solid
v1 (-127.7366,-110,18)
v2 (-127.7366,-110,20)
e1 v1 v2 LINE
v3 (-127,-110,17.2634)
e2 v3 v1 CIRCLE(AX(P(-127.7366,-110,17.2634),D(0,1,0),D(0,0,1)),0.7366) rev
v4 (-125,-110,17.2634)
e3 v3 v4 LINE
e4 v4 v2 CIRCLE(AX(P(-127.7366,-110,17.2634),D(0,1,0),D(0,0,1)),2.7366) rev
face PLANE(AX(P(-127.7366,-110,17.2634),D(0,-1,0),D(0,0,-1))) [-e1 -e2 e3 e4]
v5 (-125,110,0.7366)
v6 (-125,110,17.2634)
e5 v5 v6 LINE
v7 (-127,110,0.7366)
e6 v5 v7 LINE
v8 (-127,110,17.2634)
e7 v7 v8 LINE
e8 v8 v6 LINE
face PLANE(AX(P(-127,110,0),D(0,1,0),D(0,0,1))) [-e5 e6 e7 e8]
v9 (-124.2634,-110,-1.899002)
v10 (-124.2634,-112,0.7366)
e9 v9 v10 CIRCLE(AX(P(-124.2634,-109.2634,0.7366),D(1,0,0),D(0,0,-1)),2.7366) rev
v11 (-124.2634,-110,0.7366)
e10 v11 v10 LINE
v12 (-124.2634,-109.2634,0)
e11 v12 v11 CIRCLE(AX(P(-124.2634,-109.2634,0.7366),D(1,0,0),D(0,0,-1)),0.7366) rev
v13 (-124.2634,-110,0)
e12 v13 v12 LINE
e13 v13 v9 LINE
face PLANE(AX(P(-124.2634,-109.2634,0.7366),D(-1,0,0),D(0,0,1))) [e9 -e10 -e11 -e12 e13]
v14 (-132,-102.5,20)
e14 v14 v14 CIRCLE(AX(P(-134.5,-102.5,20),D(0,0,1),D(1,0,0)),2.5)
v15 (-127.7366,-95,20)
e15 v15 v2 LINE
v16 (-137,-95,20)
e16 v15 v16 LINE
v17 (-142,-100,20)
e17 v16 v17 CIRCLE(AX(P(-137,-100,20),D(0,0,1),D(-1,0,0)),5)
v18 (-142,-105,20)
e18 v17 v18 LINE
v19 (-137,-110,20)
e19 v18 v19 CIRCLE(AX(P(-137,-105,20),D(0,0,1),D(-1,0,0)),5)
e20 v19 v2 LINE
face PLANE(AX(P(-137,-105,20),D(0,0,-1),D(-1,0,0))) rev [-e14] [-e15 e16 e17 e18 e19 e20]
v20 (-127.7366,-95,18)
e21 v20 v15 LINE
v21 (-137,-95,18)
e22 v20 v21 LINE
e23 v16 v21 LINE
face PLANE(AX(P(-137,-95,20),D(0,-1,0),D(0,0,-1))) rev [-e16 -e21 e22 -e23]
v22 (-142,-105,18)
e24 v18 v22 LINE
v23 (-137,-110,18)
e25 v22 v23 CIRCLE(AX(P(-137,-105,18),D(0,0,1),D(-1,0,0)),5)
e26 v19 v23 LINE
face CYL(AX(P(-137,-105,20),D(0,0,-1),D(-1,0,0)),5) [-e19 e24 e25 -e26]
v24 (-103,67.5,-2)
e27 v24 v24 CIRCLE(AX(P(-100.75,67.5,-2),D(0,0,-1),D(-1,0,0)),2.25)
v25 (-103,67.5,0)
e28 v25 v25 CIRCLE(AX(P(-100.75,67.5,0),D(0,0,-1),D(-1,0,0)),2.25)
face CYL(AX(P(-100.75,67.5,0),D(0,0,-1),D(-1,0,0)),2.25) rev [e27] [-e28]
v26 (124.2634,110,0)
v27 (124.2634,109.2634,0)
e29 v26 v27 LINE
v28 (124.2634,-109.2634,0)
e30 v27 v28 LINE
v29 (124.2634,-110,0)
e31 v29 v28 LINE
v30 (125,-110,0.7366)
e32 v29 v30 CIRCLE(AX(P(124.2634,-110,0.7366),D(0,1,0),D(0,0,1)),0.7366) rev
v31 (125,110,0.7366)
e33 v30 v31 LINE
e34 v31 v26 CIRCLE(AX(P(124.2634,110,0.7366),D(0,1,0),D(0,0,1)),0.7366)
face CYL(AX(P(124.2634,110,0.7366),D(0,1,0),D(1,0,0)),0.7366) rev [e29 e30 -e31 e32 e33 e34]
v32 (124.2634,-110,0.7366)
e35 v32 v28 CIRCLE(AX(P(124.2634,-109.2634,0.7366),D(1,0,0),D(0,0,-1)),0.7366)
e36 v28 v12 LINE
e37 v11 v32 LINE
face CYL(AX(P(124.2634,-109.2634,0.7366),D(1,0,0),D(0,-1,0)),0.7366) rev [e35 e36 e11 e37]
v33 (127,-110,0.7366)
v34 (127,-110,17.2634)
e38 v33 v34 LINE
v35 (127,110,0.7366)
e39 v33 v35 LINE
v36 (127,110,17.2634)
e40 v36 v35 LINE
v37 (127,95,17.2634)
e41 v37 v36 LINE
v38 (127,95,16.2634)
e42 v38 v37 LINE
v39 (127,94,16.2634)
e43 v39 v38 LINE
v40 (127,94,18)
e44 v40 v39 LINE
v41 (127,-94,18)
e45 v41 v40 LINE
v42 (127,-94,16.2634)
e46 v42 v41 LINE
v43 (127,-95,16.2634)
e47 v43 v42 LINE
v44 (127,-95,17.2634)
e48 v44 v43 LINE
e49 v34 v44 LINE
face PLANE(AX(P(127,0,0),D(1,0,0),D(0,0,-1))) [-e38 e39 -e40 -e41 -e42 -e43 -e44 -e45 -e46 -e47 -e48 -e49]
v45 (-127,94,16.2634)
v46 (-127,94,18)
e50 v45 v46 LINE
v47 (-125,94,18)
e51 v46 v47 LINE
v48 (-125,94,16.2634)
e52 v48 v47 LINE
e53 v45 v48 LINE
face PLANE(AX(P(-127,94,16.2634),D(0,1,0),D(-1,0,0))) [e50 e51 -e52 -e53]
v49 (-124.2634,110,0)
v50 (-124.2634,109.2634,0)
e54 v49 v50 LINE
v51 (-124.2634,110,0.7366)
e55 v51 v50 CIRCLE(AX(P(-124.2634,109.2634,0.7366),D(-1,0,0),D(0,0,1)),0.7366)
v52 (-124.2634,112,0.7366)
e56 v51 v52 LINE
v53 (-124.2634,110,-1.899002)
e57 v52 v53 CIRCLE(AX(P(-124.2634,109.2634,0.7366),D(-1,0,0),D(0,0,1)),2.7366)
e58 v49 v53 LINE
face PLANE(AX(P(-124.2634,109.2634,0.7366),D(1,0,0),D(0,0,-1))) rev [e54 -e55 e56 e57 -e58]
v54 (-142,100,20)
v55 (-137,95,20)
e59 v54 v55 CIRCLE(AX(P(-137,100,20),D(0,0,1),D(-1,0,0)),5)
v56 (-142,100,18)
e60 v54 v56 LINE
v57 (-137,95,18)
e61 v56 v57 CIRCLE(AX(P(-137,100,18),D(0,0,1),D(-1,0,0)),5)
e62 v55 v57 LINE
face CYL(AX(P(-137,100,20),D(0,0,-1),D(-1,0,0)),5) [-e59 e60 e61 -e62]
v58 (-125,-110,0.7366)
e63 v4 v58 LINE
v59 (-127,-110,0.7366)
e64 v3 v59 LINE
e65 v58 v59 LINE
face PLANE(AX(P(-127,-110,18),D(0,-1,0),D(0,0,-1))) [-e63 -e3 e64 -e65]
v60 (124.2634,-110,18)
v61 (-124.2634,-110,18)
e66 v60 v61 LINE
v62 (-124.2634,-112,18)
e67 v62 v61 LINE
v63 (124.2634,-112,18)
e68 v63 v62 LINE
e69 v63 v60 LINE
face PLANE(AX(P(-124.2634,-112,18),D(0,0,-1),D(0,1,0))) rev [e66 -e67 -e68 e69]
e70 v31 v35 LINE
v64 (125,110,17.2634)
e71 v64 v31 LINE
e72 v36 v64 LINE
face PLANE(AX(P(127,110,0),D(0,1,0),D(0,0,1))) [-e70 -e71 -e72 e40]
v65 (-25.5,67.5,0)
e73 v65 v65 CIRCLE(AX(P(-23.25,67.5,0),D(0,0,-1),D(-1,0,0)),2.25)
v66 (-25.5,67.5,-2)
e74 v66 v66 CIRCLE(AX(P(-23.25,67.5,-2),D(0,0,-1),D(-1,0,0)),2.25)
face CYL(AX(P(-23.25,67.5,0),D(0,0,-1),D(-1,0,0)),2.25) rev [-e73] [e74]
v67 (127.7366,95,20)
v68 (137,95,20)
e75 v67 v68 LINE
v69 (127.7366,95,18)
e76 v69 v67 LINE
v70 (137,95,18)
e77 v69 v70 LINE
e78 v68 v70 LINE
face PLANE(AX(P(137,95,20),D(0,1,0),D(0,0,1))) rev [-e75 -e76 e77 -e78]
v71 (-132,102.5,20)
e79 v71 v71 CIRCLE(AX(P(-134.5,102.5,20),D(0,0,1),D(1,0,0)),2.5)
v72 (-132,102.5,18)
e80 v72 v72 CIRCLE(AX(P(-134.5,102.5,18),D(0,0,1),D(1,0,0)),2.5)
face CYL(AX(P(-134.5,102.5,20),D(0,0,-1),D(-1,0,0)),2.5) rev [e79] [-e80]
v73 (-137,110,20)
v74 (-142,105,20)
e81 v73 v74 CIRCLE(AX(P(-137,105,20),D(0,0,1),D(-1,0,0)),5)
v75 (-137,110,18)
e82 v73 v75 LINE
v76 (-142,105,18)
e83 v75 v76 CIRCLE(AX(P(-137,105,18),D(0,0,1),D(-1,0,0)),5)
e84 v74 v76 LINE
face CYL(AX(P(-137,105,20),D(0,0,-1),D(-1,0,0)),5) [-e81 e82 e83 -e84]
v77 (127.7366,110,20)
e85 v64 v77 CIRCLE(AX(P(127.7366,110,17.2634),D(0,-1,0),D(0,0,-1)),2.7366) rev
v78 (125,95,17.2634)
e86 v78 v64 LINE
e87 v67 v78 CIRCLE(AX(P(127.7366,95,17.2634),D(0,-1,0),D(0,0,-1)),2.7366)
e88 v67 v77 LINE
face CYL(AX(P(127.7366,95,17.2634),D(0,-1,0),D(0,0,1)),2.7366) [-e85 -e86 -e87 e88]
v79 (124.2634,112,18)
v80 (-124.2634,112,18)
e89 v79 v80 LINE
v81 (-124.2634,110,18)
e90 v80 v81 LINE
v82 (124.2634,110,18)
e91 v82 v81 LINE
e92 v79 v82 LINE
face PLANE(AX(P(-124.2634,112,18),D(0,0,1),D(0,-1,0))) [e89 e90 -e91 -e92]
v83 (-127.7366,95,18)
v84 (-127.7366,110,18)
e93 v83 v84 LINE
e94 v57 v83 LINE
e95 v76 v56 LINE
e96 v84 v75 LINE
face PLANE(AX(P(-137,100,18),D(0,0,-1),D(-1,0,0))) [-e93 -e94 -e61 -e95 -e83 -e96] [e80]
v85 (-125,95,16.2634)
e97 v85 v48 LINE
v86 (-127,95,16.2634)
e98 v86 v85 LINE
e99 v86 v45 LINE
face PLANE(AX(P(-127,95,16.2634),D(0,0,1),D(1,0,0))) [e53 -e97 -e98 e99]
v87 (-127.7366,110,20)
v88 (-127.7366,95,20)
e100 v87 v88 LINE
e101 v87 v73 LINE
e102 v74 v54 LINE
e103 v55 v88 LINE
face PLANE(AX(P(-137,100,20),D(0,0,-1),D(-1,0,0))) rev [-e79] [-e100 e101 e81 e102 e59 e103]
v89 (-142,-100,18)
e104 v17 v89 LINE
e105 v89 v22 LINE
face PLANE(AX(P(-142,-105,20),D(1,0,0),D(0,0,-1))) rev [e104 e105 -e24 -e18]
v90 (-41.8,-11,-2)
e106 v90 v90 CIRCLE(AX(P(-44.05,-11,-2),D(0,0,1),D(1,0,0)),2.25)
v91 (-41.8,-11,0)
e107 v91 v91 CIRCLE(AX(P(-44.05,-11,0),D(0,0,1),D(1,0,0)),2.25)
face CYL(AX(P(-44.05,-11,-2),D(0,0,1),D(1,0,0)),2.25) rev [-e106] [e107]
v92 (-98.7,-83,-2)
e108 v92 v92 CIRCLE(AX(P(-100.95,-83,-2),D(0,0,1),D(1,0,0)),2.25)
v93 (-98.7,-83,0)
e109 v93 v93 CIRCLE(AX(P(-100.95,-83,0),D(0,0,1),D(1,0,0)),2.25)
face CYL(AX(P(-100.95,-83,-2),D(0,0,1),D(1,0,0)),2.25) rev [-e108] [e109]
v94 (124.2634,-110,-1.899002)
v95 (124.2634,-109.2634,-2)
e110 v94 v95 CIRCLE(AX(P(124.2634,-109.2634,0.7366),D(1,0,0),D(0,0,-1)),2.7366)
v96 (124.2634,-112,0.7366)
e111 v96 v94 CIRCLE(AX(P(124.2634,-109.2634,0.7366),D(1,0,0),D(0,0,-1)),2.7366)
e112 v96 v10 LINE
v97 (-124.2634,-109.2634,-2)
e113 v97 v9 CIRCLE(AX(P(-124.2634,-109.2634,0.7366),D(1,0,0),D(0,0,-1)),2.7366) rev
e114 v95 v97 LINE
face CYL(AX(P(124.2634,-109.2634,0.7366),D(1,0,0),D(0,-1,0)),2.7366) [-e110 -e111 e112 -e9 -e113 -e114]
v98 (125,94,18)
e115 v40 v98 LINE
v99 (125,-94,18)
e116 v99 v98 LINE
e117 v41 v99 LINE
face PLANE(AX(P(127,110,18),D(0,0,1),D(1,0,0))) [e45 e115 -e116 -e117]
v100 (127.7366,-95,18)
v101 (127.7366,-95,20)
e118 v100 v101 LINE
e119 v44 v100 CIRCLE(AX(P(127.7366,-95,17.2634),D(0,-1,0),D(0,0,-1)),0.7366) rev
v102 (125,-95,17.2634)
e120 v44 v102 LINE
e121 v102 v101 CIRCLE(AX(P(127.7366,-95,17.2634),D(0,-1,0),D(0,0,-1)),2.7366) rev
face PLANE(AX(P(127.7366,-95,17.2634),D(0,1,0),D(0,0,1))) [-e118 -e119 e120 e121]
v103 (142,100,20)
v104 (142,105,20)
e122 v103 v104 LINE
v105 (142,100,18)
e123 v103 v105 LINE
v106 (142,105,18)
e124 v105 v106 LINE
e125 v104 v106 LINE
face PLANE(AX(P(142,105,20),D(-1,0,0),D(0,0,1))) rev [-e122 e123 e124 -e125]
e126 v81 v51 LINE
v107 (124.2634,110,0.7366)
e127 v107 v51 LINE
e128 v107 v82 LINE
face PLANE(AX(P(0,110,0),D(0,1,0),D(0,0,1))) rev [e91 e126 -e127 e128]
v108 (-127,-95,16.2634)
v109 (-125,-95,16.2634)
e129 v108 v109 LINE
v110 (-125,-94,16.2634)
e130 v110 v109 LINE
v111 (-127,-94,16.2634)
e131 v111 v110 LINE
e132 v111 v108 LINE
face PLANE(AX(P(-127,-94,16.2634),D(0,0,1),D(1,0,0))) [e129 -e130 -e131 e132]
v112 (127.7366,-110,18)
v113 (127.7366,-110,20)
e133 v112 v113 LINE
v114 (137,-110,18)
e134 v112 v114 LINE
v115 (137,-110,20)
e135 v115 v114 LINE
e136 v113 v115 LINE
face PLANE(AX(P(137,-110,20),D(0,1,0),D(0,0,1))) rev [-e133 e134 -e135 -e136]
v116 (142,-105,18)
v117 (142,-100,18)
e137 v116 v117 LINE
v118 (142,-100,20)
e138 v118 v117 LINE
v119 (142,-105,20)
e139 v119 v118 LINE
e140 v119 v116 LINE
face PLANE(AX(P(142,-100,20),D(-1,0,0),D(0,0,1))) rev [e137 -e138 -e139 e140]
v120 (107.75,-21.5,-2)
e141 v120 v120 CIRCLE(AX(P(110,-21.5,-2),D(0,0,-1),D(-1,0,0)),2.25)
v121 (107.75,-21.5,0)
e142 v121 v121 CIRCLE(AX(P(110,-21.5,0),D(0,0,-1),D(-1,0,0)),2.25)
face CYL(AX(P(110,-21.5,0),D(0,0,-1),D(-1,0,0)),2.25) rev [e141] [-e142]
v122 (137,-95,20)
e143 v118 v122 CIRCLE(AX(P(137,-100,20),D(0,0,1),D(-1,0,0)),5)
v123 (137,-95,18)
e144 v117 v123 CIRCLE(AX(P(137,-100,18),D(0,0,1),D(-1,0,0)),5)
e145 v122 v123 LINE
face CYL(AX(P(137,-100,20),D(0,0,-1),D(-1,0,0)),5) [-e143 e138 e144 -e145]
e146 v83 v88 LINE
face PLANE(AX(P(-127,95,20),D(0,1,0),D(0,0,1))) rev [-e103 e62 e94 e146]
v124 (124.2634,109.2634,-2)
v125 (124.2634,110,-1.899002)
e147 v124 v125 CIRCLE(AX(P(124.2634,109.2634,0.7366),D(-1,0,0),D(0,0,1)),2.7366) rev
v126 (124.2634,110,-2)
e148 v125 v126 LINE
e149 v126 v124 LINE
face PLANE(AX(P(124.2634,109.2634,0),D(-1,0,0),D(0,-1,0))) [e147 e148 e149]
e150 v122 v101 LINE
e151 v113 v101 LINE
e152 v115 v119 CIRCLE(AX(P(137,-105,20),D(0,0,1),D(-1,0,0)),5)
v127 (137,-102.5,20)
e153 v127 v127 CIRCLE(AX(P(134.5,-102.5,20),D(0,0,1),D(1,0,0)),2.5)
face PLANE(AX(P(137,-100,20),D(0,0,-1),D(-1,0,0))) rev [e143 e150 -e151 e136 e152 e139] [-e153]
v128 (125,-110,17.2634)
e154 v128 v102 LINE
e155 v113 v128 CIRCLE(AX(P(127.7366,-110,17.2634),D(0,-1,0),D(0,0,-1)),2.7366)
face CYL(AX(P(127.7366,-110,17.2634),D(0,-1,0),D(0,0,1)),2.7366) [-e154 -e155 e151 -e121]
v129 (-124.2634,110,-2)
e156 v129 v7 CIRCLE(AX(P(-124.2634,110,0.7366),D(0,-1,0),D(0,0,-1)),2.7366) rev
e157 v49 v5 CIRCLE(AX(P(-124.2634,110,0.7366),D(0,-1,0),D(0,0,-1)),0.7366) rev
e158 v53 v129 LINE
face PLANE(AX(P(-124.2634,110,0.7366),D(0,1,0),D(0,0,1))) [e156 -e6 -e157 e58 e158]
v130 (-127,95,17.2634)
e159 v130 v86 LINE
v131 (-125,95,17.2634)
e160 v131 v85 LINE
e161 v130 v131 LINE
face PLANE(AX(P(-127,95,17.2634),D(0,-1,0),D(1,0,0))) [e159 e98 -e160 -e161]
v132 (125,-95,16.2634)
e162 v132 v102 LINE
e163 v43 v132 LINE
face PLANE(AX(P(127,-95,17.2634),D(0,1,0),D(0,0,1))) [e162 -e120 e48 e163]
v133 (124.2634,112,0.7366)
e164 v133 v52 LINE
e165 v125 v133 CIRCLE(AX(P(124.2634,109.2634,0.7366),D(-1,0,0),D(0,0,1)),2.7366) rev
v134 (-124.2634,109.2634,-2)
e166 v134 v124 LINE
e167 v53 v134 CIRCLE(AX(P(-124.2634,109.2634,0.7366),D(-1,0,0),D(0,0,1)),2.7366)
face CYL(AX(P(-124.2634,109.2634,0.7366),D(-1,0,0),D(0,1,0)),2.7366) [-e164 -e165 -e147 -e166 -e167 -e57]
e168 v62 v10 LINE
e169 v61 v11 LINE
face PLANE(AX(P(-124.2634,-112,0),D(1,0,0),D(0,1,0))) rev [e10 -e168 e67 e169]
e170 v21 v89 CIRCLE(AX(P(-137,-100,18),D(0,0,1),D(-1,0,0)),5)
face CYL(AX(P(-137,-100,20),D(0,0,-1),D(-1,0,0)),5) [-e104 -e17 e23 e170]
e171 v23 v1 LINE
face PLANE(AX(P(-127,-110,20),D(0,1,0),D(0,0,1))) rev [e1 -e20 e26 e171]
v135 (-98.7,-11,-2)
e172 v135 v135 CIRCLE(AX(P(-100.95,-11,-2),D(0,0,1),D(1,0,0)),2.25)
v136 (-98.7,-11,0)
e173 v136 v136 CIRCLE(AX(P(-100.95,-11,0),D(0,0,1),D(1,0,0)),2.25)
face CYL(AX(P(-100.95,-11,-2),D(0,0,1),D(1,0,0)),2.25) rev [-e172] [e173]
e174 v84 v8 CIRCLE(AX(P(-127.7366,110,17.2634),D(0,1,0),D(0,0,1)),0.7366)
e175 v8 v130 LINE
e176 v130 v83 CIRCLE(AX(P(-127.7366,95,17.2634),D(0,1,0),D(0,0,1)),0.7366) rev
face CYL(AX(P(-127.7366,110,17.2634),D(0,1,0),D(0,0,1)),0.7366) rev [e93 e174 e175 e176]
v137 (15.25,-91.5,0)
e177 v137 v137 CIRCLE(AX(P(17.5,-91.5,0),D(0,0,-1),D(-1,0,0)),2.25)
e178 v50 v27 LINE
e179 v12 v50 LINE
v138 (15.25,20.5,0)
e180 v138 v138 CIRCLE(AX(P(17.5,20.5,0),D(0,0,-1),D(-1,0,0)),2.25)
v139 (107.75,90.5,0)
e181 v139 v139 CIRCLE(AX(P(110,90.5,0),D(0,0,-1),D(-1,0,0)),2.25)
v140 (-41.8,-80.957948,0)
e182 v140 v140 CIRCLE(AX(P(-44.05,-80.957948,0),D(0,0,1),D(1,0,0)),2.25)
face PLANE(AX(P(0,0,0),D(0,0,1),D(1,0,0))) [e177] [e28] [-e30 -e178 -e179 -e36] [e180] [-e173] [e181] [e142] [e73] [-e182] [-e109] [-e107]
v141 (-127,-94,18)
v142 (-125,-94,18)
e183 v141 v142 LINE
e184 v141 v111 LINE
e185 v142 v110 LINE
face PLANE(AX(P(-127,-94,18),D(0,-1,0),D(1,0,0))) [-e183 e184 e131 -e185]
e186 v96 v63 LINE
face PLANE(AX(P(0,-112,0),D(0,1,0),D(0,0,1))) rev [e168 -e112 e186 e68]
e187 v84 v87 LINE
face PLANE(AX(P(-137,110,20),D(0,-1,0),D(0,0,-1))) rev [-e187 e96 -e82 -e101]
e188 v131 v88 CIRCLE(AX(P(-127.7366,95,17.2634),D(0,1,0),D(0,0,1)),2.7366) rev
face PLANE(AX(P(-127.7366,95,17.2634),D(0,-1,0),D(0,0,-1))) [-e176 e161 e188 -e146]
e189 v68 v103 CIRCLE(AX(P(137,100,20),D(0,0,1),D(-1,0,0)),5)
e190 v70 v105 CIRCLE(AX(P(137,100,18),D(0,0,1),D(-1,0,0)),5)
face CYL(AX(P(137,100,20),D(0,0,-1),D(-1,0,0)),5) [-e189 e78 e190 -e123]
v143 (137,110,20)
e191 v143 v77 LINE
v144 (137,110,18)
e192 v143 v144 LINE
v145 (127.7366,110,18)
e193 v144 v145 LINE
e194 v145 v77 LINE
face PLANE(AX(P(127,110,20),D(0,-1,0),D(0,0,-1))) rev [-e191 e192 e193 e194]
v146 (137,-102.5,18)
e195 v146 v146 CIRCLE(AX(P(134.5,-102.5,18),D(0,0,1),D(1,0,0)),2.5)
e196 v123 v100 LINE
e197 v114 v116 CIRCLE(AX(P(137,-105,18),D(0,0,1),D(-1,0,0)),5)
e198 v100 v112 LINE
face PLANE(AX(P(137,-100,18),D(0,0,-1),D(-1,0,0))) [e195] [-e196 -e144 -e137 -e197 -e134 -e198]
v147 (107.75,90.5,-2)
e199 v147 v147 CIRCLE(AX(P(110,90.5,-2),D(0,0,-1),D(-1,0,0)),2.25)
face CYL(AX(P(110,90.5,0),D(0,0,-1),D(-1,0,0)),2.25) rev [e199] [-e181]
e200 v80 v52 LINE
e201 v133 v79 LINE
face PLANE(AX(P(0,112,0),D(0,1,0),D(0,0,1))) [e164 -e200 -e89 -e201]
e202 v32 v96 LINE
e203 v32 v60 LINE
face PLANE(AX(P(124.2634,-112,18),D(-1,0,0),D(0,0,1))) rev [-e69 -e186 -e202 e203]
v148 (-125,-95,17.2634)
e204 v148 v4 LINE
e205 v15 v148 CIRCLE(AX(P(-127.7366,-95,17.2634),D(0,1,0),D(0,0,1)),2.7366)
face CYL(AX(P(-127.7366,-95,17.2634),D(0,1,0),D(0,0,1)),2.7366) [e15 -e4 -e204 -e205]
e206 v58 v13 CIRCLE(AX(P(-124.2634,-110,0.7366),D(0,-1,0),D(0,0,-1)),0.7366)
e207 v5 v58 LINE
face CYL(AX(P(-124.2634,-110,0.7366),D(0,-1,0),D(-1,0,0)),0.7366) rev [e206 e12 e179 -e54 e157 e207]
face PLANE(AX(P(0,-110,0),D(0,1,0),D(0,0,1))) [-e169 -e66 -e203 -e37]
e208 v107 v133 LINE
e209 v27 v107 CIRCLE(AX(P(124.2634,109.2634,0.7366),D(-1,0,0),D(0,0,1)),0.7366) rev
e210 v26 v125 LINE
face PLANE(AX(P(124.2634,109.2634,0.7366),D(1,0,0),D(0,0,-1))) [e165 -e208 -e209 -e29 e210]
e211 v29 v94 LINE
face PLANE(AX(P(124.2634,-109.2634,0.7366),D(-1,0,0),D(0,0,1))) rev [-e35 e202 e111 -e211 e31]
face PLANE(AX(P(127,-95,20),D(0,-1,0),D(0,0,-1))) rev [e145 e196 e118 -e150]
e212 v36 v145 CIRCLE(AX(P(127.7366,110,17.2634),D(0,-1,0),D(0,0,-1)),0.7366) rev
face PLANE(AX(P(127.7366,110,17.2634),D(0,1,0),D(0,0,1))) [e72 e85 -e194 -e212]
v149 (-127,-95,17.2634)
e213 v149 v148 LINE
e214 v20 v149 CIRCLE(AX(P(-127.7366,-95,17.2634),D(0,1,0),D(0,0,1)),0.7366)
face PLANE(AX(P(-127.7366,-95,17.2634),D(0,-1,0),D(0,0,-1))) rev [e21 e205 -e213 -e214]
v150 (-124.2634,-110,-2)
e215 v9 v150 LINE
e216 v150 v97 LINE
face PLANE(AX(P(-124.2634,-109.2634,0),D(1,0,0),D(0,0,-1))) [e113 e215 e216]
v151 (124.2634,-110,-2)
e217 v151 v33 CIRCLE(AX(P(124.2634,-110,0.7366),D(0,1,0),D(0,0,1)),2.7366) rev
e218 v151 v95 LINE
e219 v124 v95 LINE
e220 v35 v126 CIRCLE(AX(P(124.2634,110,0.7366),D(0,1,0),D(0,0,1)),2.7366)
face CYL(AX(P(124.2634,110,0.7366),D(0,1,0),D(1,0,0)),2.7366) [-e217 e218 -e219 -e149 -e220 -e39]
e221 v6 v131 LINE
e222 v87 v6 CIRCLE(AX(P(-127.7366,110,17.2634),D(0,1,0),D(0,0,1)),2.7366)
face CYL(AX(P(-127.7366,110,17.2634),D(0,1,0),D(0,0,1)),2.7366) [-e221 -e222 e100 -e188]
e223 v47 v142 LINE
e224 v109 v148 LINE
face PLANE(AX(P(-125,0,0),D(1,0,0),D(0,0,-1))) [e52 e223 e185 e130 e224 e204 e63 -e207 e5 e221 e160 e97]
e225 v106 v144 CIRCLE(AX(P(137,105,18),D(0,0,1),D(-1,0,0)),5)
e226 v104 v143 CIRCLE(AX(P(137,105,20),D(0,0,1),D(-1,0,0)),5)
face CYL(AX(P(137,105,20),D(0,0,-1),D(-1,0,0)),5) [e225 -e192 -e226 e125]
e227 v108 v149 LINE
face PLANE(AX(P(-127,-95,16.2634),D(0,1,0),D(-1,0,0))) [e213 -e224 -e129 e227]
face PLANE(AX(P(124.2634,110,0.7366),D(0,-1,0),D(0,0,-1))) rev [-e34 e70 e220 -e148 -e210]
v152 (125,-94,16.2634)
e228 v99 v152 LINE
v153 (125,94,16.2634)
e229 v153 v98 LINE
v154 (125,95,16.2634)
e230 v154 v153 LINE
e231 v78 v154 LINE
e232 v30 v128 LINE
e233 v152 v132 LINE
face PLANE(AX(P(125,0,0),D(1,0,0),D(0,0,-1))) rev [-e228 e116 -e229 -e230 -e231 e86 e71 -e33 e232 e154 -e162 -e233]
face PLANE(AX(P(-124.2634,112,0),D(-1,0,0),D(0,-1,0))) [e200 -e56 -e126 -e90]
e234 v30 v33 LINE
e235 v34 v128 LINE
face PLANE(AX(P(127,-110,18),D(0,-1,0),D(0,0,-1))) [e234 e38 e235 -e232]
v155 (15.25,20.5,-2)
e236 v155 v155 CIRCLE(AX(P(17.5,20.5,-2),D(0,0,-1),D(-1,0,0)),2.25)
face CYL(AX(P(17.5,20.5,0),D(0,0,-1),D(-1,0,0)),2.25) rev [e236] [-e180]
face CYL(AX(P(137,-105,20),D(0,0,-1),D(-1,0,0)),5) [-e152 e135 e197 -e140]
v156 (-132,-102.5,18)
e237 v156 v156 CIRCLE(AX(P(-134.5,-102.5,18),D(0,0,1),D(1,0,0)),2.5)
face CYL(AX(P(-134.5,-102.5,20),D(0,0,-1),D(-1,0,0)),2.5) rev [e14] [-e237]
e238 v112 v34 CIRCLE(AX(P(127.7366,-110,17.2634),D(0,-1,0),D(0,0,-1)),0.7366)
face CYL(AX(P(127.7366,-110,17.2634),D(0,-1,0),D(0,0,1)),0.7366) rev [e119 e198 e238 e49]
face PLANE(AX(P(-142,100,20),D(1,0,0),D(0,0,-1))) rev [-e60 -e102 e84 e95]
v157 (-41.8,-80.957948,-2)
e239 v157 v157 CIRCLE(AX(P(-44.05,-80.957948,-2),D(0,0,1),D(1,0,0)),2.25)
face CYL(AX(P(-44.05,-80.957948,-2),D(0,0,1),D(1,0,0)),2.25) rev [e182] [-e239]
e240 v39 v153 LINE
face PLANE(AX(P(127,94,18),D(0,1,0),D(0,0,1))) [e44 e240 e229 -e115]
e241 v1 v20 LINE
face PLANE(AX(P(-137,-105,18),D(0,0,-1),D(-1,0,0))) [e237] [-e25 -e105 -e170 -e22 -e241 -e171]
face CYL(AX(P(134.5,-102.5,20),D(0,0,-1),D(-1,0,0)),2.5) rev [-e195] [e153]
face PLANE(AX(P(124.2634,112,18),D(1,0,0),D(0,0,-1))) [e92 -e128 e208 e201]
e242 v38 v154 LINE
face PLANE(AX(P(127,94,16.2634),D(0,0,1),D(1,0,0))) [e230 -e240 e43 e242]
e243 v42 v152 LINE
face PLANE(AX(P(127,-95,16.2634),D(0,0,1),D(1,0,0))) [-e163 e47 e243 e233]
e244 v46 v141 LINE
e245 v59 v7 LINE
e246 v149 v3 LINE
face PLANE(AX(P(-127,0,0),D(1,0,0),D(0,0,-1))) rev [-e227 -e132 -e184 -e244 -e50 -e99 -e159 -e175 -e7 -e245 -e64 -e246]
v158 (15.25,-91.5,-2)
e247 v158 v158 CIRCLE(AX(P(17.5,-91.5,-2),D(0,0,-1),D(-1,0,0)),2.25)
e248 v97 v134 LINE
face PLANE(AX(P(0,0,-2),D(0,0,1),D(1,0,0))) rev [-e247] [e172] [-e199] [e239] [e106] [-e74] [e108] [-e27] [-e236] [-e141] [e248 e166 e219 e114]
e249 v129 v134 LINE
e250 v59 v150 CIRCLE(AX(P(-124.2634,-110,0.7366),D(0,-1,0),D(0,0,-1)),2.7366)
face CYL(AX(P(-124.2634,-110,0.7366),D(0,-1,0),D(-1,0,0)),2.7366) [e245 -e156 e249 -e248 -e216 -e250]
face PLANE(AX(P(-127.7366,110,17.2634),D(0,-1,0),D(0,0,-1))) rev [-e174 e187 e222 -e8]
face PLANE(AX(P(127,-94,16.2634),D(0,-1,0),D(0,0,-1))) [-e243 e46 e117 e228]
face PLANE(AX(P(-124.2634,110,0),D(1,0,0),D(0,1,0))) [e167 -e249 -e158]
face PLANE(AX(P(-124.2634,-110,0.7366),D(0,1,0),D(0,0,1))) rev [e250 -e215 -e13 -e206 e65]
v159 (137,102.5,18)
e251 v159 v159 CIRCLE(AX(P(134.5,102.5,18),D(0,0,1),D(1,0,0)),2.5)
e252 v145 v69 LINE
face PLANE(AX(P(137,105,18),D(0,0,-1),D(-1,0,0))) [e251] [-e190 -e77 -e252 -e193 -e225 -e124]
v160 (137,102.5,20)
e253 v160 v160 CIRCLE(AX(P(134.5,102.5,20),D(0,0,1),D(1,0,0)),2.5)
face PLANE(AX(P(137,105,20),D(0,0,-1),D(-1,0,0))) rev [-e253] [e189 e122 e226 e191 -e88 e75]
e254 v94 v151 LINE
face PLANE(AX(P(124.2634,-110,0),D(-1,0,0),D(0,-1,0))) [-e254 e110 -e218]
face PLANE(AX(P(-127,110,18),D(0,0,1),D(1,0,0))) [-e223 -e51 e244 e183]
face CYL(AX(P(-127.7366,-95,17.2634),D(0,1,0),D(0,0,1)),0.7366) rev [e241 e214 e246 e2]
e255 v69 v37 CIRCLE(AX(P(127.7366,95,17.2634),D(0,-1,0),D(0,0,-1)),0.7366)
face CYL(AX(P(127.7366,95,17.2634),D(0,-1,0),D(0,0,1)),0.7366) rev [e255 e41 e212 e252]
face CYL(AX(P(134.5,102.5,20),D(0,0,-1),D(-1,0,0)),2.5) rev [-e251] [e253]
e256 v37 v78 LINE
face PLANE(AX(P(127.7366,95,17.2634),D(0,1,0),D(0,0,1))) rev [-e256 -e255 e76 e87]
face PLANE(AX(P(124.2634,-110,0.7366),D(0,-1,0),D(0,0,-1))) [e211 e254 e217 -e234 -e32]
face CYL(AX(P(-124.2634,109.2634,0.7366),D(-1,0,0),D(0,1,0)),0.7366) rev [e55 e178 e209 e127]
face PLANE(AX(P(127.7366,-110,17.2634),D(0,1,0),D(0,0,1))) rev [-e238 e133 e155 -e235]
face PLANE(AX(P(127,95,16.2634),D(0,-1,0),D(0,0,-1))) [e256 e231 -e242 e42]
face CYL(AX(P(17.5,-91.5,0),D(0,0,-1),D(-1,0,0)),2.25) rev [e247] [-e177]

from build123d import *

# Parameters (mm, degrees)
SKETCH1_W                      = 250
SKETCH1_H                      = 220
BASE_FLANGE1_DEPTH             = 2
EDGE_FLANGE1_STRIP_W           = 9.4732
EDGE_FLANGE1_STRIP_H           = 2
EDGE_FLANGE1_STRIP_CUT_DEPTH   = 220
EDGE_FLANGE1_STRIP_2_W         = 9.4732
EDGE_FLANGE1_STRIP_2_H         = 2
EDGE_FLANGE1_STRIP_CUT_2_DEPTH = 220
EDGE_FLANGE1_DEPTH             = 220
EDGE_FLANGE1_BEND_DEPTH        = 220
EDGE_FLANGE2_STRIP_W           = 9.4732
EDGE_FLANGE2_STRIP_H           = 2
EDGE_FLANGE2_STRIP_CUT_DEPTH   = 248.5268
EDGE_FLANGE2_DEPTH             = 248.5268
EDGE_FLANGE3_STRIP_W           = 9.4732
EDGE_FLANGE3_STRIP_H           = 2
EDGE_FLANGE3_STRIP_CUT_DEPTH   = 248.5268
EDGE_FLANGE3_DEPTH             = 248.5268
EDGE_FLANGE4_STRIP_W           = 9.4732
EDGE_FLANGE4_STRIP_H           = 2
EDGE_FLANGE4_STRIP_CUT_DEPTH   = 15
EDGE_FLANGE4_RELIEF_W          = 10.4732
EDGE_FLANGE4_RELIEF_H          = 1
EDGE_FLANGE4_RELIEF_CUT_DEPTH  = 2
EDGE_FLANGE4_DEPTH             = 15
EDGE_FLANGE4_START             = 2
EDGE_FLANGE4_PROFILE_R         = 2.5
EDGE_FLANGE4_FLAT_DEPTH        = 2
EDGE_FLANGE5_STRIP_W           = 9.4732
EDGE_FLANGE5_STRIP_H           = 2
EDGE_FLANGE5_STRIP_CUT_DEPTH   = 15
EDGE_FLANGE5_RELIEF_W          = 10.4732
EDGE_FLANGE5_RELIEF_H          = 1
EDGE_FLANGE5_RELIEF_CUT_DEPTH  = 2
EDGE_FLANGE5_DEPTH             = 15
EDGE_FLANGE5_START             = 2
EDGE_FLANGE5_PROFILE_R         = 2.5
EDGE_FLANGE5_FLAT_DEPTH        = 2
EDGE_FLANGE7_STRIP_W           = 9.4732
EDGE_FLANGE7_STRIP_H           = 2
EDGE_FLANGE7_STRIP_CUT_DEPTH   = 15
EDGE_FLANGE7_RELIEF_W          = 10.4732
EDGE_FLANGE7_RELIEF_H          = 1
EDGE_FLANGE7_RELIEF_CUT_DEPTH  = 2
EDGE_FLANGE7_DEPTH             = 15
EDGE_FLANGE7_START             = 2
EDGE_FLANGE7_PROFILE_R         = 2.5
EDGE_FLANGE7_FLAT_DEPTH        = 2
EDGE_FLANGE8_STRIP_W           = 9.4732
EDGE_FLANGE8_STRIP_H           = 2
EDGE_FLANGE8_STRIP_CUT_DEPTH   = 15
EDGE_FLANGE8_RELIEF_W          = 10.4732
EDGE_FLANGE8_RELIEF_H          = 1
EDGE_FLANGE8_RELIEF_CUT_DEPTH  = 2
EDGE_FLANGE8_DEPTH             = 15
EDGE_FLANGE8_START             = 2
EDGE_FLANGE8_PROFILE_R         = 2.5
EDGE_FLANGE8_FLAT_DEPTH        = 2
SKETCH34_R                     = 2.25
CUT_EXTRUDE1_DEPTH             = 10
SKETCH35_R                     = 2.25
CUT_EXTRUDE2_DEPTH             = 10


# Sheet-metal steps are written as plain solids
with BuildPart() as part:
    # Sketch1 → Base-Flange1 (new body)
    with BuildSketch(Plane.XY):
        Rectangle(SKETCH1_W, SKETCH1_H)
    extrude(amount=-BASE_FLANGE1_DEPTH)

    # Edge-Flange1 strip (across the edge) → Edge-Flange1 strip cut (cut)
    with BuildSketch(Plane(origin=(125, -110, 0), x_dir=(-1, 0, 0), z_dir=(0, 1, 0))):
        with Locations((-4, -1)):
            Rectangle(EDGE_FLANGE1_STRIP_W, EDGE_FLANGE1_STRIP_H)
    extrude(amount=EDGE_FLANGE1_STRIP_CUT_DEPTH, mode=Mode.SUBTRACT)

    # Edge-Flange1 strip 2 (across the edge) → Edge-Flange1 strip cut 2 (cut)
    with BuildSketch(Plane(origin=(-125, 110, 0), x_dir=(1, 0, 0), z_dir=(0, -1, 0))):
        with Locations((-4, -1)):
            Rectangle(EDGE_FLANGE1_STRIP_2_W, EDGE_FLANGE1_STRIP_2_H)
    extrude(amount=EDGE_FLANGE1_STRIP_CUT_2_DEPTH, mode=Mode.SUBTRACT)

    # Edge-Flange1 section (across the edge) → Edge-Flange1 (add)
    with BuildSketch(Plane(origin=(125, -110, 0), x_dir=(-1, 0, 0), z_dir=(0, 1, 0))):
        with BuildLine():
            Line((-2, 0.7366), (-2, 18))
            Line((-2, 18), (0, 18))
            Line((0, 18), (0, 0.7366))
            ThreePointArc((0, 0.7366), (0.215745145, 0.215745145), (0.7366, 0))
            Line((0.7366, 0), (0.7366, -2))
            ThreePointArc((0.7366, -2), (-1.198468417, -1.198468417), (-2, 0.7366))
        make_face()
    extrude(amount=EDGE_FLANGE1_DEPTH)

    # Edge-Flange1 section 2 (across the edge) → Edge-Flange1 bend (add)
    with BuildSketch(Plane(origin=(-125, 110, 0), x_dir=(1, 0, 0), z_dir=(0, -1, 0))):
        with BuildLine():
            Line((-2, 0.7366), (-2, 18))
            Line((-2, 18), (0, 18))
            Line((0, 18), (0, 0.7366))
            ThreePointArc((0, 0.7366), (0.215745145, 0.215745145), (0.7366, 0))
            Line((0.7366, 0), (0.7366, -2))
            ThreePointArc((0.7366, -2), (-1.198468417, -1.198468417), (-2, 0.7366))
        make_face()
    extrude(amount=EDGE_FLANGE1_BEND_DEPTH)

    # Edge-Flange2 strip (across the edge) → Edge-Flange2 strip cut (cut)
    with BuildSketch(Plane(origin=(124.2634, 110, 0), x_dir=(0, -1, 0), z_dir=(-1, 0, 0))):
        with Locations((-4, -1)):
            Rectangle(EDGE_FLANGE2_STRIP_W, EDGE_FLANGE2_STRIP_H)
    extrude(amount=EDGE_FLANGE2_STRIP_CUT_DEPTH, mode=Mode.SUBTRACT)

    # Edge-Flange2 section (across the edge) → Edge-Flange2 (add)
    with BuildSketch(Plane(origin=(124.2634, 110, 0), x_dir=(0, -1, 0), z_dir=(-1, 0, 0))):
        with BuildLine():
            Line((-2, 0.7366), (-2, 18))
            Line((-2, 18), (0, 18))
            Line((0, 18), (0, 0.7366))
            ThreePointArc((0, 0.7366), (0.215745145, 0.215745145), (0.7366, 0))
            Line((0.7366, 0), (0.7366, -2))
            ThreePointArc((0.7366, -2), (-1.198468417, -1.198468417), (-2, 0.7366))
        make_face()
    extrude(amount=EDGE_FLANGE2_DEPTH)

    # Edge-Flange3 strip (across the edge) → Edge-Flange3 strip cut (cut)
    with BuildSketch(Plane(origin=(-124.2634, -110, 0), x_dir=(0, 1, 0), z_dir=(1, 0, 0))):
        with Locations((-4, -1)):
            Rectangle(EDGE_FLANGE3_STRIP_W, EDGE_FLANGE3_STRIP_H)
    extrude(amount=EDGE_FLANGE3_STRIP_CUT_DEPTH, mode=Mode.SUBTRACT)

    # Edge-Flange3 section (across the edge) → Edge-Flange3 (add)
    with BuildSketch(Plane(origin=(-124.2634, -110, 0), x_dir=(0, 1, 0), z_dir=(1, 0, 0))):
        with BuildLine():
            Line((-2, 0.7366), (-2, 18))
            Line((-2, 18), (0, 18))
            Line((0, 18), (0, 0.7366))
            ThreePointArc((0, 0.7366), (0.215745145, 0.215745145), (0.7366, 0))
            Line((0.7366, 0), (0.7366, -2))
            ThreePointArc((0.7366, -2), (-1.198468417, -1.198468417), (-2, 0.7366))
        make_face()
    extrude(amount=EDGE_FLANGE3_DEPTH)

    # Edge-Flange4 strip (across the edge) → Edge-Flange4 strip cut (cut)
    with BuildSketch(Plane(origin=(127, -95, 18), x_dir=(0, 0, -1), z_dir=(0, -1, 0))):
        with Locations((-4, -1)):
            Rectangle(EDGE_FLANGE4_STRIP_W, EDGE_FLANGE4_STRIP_H)
    extrude(amount=EDGE_FLANGE4_STRIP_CUT_DEPTH, mode=Mode.SUBTRACT)

    # Edge-Flange4 relief (on the sheet) → Edge-Flange4 relief cut (cut)
    with BuildSketch(Plane(origin=(127, -95, 17.2634), x_dir=(0, 0, -1), z_dir=(1, 0, 0))):
        with Locations((-4.2366, 0.5)):
            Rectangle(EDGE_FLANGE4_RELIEF_W, EDGE_FLANGE4_RELIEF_H)
    extrude(amount=-EDGE_FLANGE4_RELIEF_CUT_DEPTH, mode=Mode.SUBTRACT)

    # Edge-Flange4 bend section (across the edge) → Edge-Flange4 (add)
    with BuildSketch(Plane(origin=(127, -95, 18), x_dir=(0, 0, -1), z_dir=(0, -1, 0))):
        with BuildLine():
            Line((-2, 0.7366), (0, 0.7366))
            ThreePointArc((0, 0.7366), (0.215745145, 0.215745145), (0.7366, 0))
            Line((0.7366, 0), (0.7366, -2))
            ThreePointArc((0.7366, -2), (-1.198468417, -1.198468417), (-2, 0.7366))
        make_face()
    extrude(amount=EDGE_FLANGE4_DEPTH)

    # Edge-Flange4 profile (on flange) → Edge-Flange4 flat (add)
    with BuildSketch(Plane(origin=(127, 0, 18), x_dir=(0, -1, 0), z_dir=(0, 0, 1)).offset(EDGE_FLANGE4_START)):
        with BuildLine():
            Line((110, 0.7366), (110, 10))
            ThreePointArc((110, 10), (108.535533906, 13.535533906), (105, 15))
            Line((105, 15), (100, 15))
            ThreePointArc((100, 15), (96.464466094, 13.535533906), (95, 10))
            Line((95, 10), (95, 0.7366))
            Line((95, 0.7366), (110, 0.7366))
        make_face()
        with Locations((102.5, 7.5)):
            Circle(EDGE_FLANGE4_PROFILE_R, mode=Mode.SUBTRACT)
    extrude(amount=-EDGE_FLANGE4_FLAT_DEPTH)

    # Edge-Flange5 strip (across the edge) → Edge-Flange5 strip cut (cut)
    with BuildSketch(Plane(origin=(127, 110, 18), x_dir=(0, 0, -1), z_dir=(0, -1, 0))):
        with Locations((-4, -1)):
            Rectangle(EDGE_FLANGE5_STRIP_W, EDGE_FLANGE5_STRIP_H)
    extrude(amount=EDGE_FLANGE5_STRIP_CUT_DEPTH, mode=Mode.SUBTRACT)

    # Edge-Flange5 relief (on the sheet) → Edge-Flange5 relief cut (cut)
    with BuildSketch(Plane(origin=(127, 110, 17.2634), x_dir=(0, 0, -1), z_dir=(1, 0, 0))):
        with Locations((-4.2366, -15.5)):
            Rectangle(EDGE_FLANGE5_RELIEF_W, EDGE_FLANGE5_RELIEF_H)
    extrude(amount=-EDGE_FLANGE5_RELIEF_CUT_DEPTH, mode=Mode.SUBTRACT)

    # Edge-Flange5 bend section (across the edge) → Edge-Flange5 (add)
    with BuildSketch(Plane(origin=(127, 110, 18), x_dir=(0, 0, -1), z_dir=(0, -1, 0))):
        with BuildLine():
            Line((-2, 0.7366), (0, 0.7366))
            ThreePointArc((0, 0.7366), (0.215745145, 0.215745145), (0.7366, 0))
            Line((0.7366, 0), (0.7366, -2))
            ThreePointArc((0.7366, -2), (-1.198468417, -1.198468417), (-2, 0.7366))
        make_face()
    extrude(amount=EDGE_FLANGE5_DEPTH)

    # Edge-Flange5 profile (on flange) → Edge-Flange5 flat (add)
    with BuildSketch(Plane(origin=(127, 0, 18), x_dir=(0, -1, 0), z_dir=(0, 0, 1)).offset(EDGE_FLANGE5_START)):
        with BuildLine():
            Line((-110, 0.7366), (-95, 0.7366))
            Line((-95, 0.7366), (-95, 10))
            ThreePointArc((-95, 10), (-96.464466094, 13.535533906), (-100, 15))
            Line((-100, 15), (-105, 15))
            ThreePointArc((-105, 15), (-108.535533906, 13.535533906), (-110, 10))
            Line((-110, 10), (-110, 0.7366))
        make_face()
        with Locations((-102.5, 7.5)):
            Circle(EDGE_FLANGE5_PROFILE_R, mode=Mode.SUBTRACT)
    extrude(amount=-EDGE_FLANGE5_FLAT_DEPTH)

    # Edge-Flange7 strip (across the edge) → Edge-Flange7 strip cut (cut)
    with BuildSketch(Plane(origin=(-127, -110, 18), x_dir=(0, 0, -1), z_dir=(0, 1, 0))):
        with Locations((-4, -1)):
            Rectangle(EDGE_FLANGE7_STRIP_W, EDGE_FLANGE7_STRIP_H)
    extrude(amount=EDGE_FLANGE7_STRIP_CUT_DEPTH, mode=Mode.SUBTRACT)

    # Edge-Flange7 relief (on the sheet) → Edge-Flange7 relief cut (cut)
    with BuildSketch(Plane(origin=(-127, -110, 17.2634), x_dir=(0, 0, -1), z_dir=(-1, 0, 0))):
        with Locations((-4.2366, -15.5)):
            Rectangle(EDGE_FLANGE7_RELIEF_W, EDGE_FLANGE7_RELIEF_H)
    extrude(amount=-EDGE_FLANGE7_RELIEF_CUT_DEPTH, mode=Mode.SUBTRACT)

    # Edge-Flange7 bend section (across the edge) → Edge-Flange7 (add)
    with BuildSketch(Plane(origin=(-127, -110, 18), x_dir=(0, 0, -1), z_dir=(0, 1, 0))):
        with BuildLine():
            Line((-2, 0.7366), (0, 0.7366))
            ThreePointArc((0, 0.7366), (0.215745145, 0.215745145), (0.7366, 0))
            Line((0.7366, 0), (0.7366, -2))
            ThreePointArc((0.7366, -2), (-1.198468417, -1.198468417), (-2, 0.7366))
        make_face()
    extrude(amount=EDGE_FLANGE7_DEPTH)

    # Edge-Flange7 profile (on flange) → Edge-Flange7 flat (add)
    with BuildSketch(Plane(origin=(-127, 0, 18), x_dir=(0, 1, 0), z_dir=(0, 0, 1)).offset(EDGE_FLANGE7_START)):
        with BuildLine():
            Line((-95, 0.7366), (-95, 10))
            ThreePointArc((-95, 10), (-96.464466094, 13.535533906), (-100, 15))
            Line((-100, 15), (-105, 15))
            ThreePointArc((-105, 15), (-108.535533906, 13.535533906), (-110, 10))
            Line((-110, 10), (-110, 0.7366))
            Line((-110, 0.7366), (-95, 0.7366))
        make_face()
        with Locations((-102.5, 7.5)):
            Circle(EDGE_FLANGE7_PROFILE_R, mode=Mode.SUBTRACT)
    extrude(amount=-EDGE_FLANGE7_FLAT_DEPTH)

    # Edge-Flange8 strip (across the edge) → Edge-Flange8 strip cut (cut)
    with BuildSketch(Plane(origin=(-127, 95, 18), x_dir=(0, 0, -1), z_dir=(0, 1, 0))):
        with Locations((-4, -1)):
            Rectangle(EDGE_FLANGE8_STRIP_W, EDGE_FLANGE8_STRIP_H)
    extrude(amount=EDGE_FLANGE8_STRIP_CUT_DEPTH, mode=Mode.SUBTRACT)

    # Edge-Flange8 relief (on the sheet) → Edge-Flange8 relief cut (cut)
    with BuildSketch(Plane(origin=(-127, 95, 17.2634), x_dir=(0, 0, -1), z_dir=(-1, 0, 0))):
        with Locations((-4.2366, 0.5)):
            Rectangle(EDGE_FLANGE8_RELIEF_W, EDGE_FLANGE8_RELIEF_H)
    extrude(amount=-EDGE_FLANGE8_RELIEF_CUT_DEPTH, mode=Mode.SUBTRACT)

    # Edge-Flange8 bend section (across the edge) → Edge-Flange8 (add)
    with BuildSketch(Plane(origin=(-127, 95, 18), x_dir=(0, 0, -1), z_dir=(0, 1, 0))):
        with BuildLine():
            Line((-2, 0.7366), (0, 0.7366))
            ThreePointArc((0, 0.7366), (0.215745145, 0.215745145), (0.7366, 0))
            Line((0.7366, 0), (0.7366, -2))
            ThreePointArc((0.7366, -2), (-1.198468417, -1.198468417), (-2, 0.7366))
        make_face()
    extrude(amount=EDGE_FLANGE8_DEPTH)

    # Edge-Flange8 profile (on flange) → Edge-Flange8 flat (add)
    with BuildSketch(Plane(origin=(-127, 0, 18), x_dir=(0, 1, 0), z_dir=(0, 0, 1)).offset(EDGE_FLANGE8_START)):
        with BuildLine():
            Line((95, 0.7366), (110, 0.7366))
            Line((110, 0.7366), (110, 10))
            ThreePointArc((110, 10), (108.535533906, 13.535533906), (105, 15))
            Line((105, 15), (100, 15))
            ThreePointArc((100, 15), (96.464466094, 13.535533906), (95, 10))
            Line((95, 10), (95, 0.7366))
        make_face()
        with Locations((102.5, 7.5)):
            Circle(EDGE_FLANGE8_PROFILE_R, mode=Mode.SUBTRACT)
    extrude(amount=-EDGE_FLANGE8_FLAT_DEPTH)

    # Sketch34 → Cut-Extrude1 (cut)
    with BuildSketch(Plane.XY):
        with Locations((-44.05, -11)):
            Circle(SKETCH34_R)
        with Locations((-44.05, -80.957948311)):
            Circle(SKETCH34_R)
        with Locations((-100.95, -83)):
            Circle(SKETCH34_R)
        with Locations((-100.95, -11)):
            Circle(SKETCH34_R)
    extrude(amount=-CUT_EXTRUDE1_DEPTH, mode=Mode.SUBTRACT)

    # Sketch35 → Cut-Extrude2 (cut)
    with BuildSketch(Plane(origin=(0, 0, -2), x_dir=(-1, 0, 0), z_dir=(0, 0, -1))):
        with Locations((100.75, 67.5)):
            Circle(SKETCH35_R)
        with Locations((23.25, 67.5)):
            Circle(SKETCH35_R)
        with Locations((-110, 90.5)):
            Circle(SKETCH35_R)
        with Locations((-17.5, 20.5)):
            Circle(SKETCH35_R)
        with Locations((-110, -21.5)):
            Circle(SKETCH35_R)
        with Locations((-17.5, -91.5)):
            Circle(SKETCH35_R)
    extrude(amount=-CUT_EXTRUDE2_DEPTH, mode=Mode.SUBTRACT)


solid = part.part
